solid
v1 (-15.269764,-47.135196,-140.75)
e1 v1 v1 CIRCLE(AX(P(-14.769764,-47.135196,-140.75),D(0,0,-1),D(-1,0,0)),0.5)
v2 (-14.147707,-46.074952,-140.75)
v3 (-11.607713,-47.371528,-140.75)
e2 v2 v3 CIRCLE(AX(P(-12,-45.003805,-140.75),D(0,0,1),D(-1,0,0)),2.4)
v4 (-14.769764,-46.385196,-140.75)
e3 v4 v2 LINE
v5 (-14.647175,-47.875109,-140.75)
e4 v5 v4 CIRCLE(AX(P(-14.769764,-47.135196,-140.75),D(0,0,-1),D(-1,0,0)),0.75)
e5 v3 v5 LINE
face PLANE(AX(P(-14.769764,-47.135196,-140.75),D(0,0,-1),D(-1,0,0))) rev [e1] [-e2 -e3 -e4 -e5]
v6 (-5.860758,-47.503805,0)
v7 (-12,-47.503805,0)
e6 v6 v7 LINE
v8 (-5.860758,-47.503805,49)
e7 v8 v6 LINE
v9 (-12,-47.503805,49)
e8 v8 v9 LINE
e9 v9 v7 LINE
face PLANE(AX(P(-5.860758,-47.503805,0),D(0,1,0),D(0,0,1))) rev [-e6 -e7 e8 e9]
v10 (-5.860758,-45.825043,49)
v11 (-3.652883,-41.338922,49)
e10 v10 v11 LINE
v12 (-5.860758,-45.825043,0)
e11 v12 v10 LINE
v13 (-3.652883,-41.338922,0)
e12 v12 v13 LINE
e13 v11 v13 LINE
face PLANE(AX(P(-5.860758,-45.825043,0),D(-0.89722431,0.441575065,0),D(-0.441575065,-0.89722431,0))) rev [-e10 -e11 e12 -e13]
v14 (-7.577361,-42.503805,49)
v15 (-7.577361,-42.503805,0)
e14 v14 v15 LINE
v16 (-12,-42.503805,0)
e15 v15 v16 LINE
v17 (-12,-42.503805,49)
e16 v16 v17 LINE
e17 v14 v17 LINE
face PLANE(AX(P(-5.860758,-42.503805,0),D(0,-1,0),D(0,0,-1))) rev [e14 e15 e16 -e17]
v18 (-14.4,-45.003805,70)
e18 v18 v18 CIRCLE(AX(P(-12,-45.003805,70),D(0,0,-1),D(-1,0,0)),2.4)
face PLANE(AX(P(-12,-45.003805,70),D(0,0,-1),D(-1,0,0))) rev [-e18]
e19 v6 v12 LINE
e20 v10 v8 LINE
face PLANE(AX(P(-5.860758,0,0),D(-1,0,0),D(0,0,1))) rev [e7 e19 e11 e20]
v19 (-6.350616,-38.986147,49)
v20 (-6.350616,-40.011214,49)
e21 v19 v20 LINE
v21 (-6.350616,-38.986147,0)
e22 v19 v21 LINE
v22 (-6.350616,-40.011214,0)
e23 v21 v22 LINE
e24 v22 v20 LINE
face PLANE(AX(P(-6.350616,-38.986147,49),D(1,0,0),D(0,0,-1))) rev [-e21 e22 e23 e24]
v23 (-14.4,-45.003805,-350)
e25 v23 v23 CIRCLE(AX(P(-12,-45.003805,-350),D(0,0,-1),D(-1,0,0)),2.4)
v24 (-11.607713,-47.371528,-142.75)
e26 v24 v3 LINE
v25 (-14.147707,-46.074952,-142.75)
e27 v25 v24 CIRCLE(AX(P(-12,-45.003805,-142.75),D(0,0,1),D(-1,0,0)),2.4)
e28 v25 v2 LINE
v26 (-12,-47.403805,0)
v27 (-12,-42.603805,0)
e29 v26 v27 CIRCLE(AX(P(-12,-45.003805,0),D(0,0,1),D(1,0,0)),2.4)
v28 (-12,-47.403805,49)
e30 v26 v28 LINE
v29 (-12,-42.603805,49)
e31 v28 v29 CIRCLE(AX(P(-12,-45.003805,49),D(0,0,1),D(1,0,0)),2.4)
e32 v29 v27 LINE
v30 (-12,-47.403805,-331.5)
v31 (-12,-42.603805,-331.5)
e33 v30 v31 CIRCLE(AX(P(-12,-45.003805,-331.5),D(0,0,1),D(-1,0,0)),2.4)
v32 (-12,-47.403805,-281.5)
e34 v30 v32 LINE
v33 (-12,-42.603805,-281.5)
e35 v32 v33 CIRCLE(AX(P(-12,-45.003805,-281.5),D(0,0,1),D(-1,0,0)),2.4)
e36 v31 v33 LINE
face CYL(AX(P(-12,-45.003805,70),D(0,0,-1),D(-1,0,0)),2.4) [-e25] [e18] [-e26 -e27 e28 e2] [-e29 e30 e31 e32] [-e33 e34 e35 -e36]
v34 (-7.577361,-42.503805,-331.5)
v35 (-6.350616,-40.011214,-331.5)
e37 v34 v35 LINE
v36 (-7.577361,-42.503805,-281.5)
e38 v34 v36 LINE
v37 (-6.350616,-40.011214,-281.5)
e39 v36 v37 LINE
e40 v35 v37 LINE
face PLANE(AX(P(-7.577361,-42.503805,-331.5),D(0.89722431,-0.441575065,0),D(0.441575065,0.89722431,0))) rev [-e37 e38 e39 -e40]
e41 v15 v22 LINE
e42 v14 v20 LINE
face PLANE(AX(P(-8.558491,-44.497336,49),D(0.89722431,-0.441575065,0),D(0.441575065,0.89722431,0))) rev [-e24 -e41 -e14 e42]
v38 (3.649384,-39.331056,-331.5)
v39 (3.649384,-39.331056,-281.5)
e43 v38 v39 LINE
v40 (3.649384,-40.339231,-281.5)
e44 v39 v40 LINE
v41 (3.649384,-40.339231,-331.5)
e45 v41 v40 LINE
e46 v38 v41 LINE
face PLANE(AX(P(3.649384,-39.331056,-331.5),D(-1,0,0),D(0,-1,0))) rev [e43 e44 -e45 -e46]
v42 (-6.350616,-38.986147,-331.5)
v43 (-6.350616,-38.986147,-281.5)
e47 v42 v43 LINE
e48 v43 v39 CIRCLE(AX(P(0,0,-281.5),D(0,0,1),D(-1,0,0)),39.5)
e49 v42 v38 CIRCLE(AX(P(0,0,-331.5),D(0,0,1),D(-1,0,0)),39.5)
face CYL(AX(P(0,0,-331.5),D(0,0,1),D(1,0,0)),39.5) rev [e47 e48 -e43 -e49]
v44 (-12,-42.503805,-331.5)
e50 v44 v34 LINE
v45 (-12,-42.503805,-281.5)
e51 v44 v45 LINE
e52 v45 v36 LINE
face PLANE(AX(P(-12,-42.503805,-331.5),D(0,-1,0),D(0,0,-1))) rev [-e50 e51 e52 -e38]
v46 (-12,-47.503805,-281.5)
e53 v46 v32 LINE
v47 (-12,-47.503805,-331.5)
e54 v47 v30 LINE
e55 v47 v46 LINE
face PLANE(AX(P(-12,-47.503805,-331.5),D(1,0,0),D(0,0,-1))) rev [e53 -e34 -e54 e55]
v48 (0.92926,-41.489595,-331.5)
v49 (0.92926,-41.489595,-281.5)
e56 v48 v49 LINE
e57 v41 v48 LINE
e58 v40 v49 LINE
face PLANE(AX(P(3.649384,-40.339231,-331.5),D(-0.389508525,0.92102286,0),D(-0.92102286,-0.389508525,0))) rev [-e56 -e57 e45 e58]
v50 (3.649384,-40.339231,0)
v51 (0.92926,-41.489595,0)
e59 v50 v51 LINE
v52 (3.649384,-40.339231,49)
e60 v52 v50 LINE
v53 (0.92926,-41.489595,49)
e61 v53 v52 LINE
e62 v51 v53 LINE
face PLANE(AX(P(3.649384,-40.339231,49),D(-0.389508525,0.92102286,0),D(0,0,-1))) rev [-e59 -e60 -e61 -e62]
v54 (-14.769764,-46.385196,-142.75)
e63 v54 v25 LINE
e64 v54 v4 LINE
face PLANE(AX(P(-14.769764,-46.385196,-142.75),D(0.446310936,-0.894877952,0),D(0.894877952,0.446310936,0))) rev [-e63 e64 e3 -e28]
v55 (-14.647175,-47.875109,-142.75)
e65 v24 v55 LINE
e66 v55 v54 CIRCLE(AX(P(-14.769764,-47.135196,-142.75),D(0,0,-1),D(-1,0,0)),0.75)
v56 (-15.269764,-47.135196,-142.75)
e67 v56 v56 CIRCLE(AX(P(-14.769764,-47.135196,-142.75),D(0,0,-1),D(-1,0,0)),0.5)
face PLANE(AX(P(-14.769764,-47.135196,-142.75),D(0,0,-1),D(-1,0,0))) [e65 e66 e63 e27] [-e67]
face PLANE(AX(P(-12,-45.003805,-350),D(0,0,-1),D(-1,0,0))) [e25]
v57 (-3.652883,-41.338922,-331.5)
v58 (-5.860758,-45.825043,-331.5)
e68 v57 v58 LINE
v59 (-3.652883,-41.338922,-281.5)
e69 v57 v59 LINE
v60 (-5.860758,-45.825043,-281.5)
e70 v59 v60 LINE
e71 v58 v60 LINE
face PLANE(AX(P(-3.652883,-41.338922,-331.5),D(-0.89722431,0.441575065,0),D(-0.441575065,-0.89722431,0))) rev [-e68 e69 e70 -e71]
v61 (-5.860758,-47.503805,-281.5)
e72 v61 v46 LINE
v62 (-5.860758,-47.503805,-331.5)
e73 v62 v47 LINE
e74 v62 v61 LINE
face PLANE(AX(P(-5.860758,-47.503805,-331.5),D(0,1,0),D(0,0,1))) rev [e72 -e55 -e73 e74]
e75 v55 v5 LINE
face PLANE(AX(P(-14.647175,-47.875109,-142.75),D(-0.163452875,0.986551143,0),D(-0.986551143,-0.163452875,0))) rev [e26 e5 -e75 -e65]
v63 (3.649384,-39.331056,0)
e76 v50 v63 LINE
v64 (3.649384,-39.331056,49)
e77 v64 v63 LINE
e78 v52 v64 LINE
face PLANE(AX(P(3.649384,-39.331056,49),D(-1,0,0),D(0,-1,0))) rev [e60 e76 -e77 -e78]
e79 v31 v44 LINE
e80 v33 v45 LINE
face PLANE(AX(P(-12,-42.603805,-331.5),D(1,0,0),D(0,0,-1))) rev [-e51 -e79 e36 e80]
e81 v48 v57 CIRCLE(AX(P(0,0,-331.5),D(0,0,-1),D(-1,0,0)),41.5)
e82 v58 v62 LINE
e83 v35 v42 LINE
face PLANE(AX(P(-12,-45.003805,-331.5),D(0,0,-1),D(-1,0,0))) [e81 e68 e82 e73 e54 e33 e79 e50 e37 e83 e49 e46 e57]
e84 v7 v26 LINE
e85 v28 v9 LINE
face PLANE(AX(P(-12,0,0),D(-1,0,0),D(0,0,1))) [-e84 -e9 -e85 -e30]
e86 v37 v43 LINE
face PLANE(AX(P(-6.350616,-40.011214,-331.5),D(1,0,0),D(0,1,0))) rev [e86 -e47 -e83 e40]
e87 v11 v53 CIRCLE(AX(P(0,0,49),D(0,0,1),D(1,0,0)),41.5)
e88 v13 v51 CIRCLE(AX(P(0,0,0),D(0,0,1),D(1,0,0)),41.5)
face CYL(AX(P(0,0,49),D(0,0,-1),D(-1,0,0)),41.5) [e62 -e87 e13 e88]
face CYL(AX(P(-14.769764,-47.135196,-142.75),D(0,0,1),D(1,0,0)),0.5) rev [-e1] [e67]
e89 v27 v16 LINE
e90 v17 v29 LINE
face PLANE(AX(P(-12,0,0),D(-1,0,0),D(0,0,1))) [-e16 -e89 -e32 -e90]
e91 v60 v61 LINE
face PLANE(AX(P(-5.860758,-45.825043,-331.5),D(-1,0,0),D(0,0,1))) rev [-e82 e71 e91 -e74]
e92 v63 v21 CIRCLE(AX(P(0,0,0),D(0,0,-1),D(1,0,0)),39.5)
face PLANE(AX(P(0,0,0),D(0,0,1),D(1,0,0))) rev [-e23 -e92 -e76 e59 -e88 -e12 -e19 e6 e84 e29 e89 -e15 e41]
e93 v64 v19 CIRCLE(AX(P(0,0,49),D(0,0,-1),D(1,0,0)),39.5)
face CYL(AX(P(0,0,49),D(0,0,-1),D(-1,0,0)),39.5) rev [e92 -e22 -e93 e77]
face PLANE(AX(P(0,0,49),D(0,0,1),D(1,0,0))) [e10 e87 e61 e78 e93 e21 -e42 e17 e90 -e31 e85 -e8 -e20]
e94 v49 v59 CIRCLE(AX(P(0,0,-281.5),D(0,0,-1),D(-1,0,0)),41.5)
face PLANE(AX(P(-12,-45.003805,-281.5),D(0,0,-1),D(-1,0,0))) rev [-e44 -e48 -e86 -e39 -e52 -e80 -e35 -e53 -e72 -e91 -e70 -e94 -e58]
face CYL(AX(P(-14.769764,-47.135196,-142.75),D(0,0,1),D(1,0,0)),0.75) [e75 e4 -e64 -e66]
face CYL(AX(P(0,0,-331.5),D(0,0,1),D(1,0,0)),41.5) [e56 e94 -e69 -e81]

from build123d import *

# Parameters (mm, degrees)
BOSS_EXTRUDE1_DEPTH      = 49
CHAMFER1_SIZE            = 1
CHAMFER2_SIZE            = 1
SKETCH4_W                = 3.006754005
SKETCH4_H                = 49
BOSS_EXTRUDE2_DEPTH      = 5
SKETCH5_W                = 49
SKETCH5_H                = 5
BOSS_EXTRUDE3_DEPTH      = 6.139242
BOSS_EXTRUDE4_DEPTH      = 350
BOSS_EXTRUDE4_DEPTH_BACK = 70
SKETCH6_R                = 2.4
BOSS_EXTRUDE5_START      = 50
BOSS_EXTRUDE5_DEPTH      = 50
SKETCH11_R               = 0.5
BOSS_EXTRUDE9_DEPTH      = 2


with BuildPart() as part:
    # Sketch1 → Boss-Extrude1 (new body)
    with BuildSketch(Plane.XY):
        with BuildLine():
            Line((-6.350615501, -38.986147319), (-6.350615501, -41.01121411))
            ThreePointArc((-6.350615501, -41.01121411), (-1.360537007, -41.477692065), (3.649384499, -41.339230675))
            Line((3.649384499, -41.339230675), (3.649384499, -39.331056339))
            ThreePointArc((3.649384499, -39.331056339), (-1.361580989, -39.476525901), (-6.350615501, -38.986147319))
        make_face()
    extrude(amount=BOSS_EXTRUDE1_DEPTH)

    # Chamfer1
    # the kernel refuses this chamfer: 3, 1 mm, written as the material it takes off along each edge
    with BuildSketch(Plane(origin=(3.649384499, -41.339230675, -7.093753287), x_dir=(0, 1, 0), z_dir=(0, 0, 1))) as chamfer1_piece_1:
        with BuildLine():
            Line((CHAMFER1_SIZE, 0), (-0.150364113, 2.720124405))
            ThreePointArc((-0.150364113, 2.720124405), (-0.100586913, 1.415213895), (0, 0))
            Line((0, 0), (CHAMFER1_SIZE, 0))
        make_face()
    extrude(amount=63.187506575, mode=Mode.SUBTRACT)

    # Chamfer2
    # the kernel refuses this chamfer: 3, 1 mm, written as the material it takes off along each edge
    with BuildSketch(Plane(origin=(-6.350615501, -41.01121411, -7.077780992), x_dir=(0.992702552846142, -0.12058872904526673, 0), z_dir=(0, 0, 1))) as chamfer2_piece_1:
        with BuildLine():
            Line((2.717564067, 0), (-CHAMFER2_SIZE * 0.120588729045, CHAMFER2_SIZE * 0.992702552846))
            Line((-CHAMFER2_SIZE * 0.120588729045, CHAMFER2_SIZE * 0.992702552846), (0, 0))
            ThreePointArc((0, 0), (1.415420862, -0.022211756), (2.717564067, 0))
        make_face()
    extrude(amount=63.155561983, mode=Mode.SUBTRACT)

    # Sketch4 → Boss-Extrude2 (add)
    with BuildSketch(Plane(origin=(-17.090415502, -34.725548264, 0), x_dir=(0.8972243095002063, -0.44157506546665215, 0), z_dir=(-0.44157506546665215, -0.8972243095002063, 0))):
        with Locations((13.473404886, 24.5)):
            Rectangle(SKETCH4_W, SKETCH4_H)
    extrude(amount=BOSS_EXTRUDE2_DEPTH)

    # Sketch5 → Boss-Extrude3 (add)
    with BuildSketch(Plane(origin=(-12, 0, 0), x_dir=(0, 0, -1), z_dir=(1, 0, 0))):
        with Locations((-24.5, -45.003805325)):
            Rectangle(SKETCH5_W, SKETCH5_H)
    extrude(amount=BOSS_EXTRUDE3_DEPTH)

    # Sketch6 → Boss-Extrude4 (add, two sides: drawn at the far end of the back side and taken through both)
    with BuildSketch(Plane(origin=(0, 0, 0), x_dir=(-1, 0, 0), z_dir=(0, 0, -1)).offset(-BOSS_EXTRUDE4_DEPTH_BACK)):
        with Locations((12, -45.003805325)):
            Circle(SKETCH6_R)
    extrude(amount=BOSS_EXTRUDE4_DEPTH + BOSS_EXTRUDE4_DEPTH_BACK)

    # Sketch8 → Boss-Extrude5 (add)
    with BuildSketch(Plane(origin=(0, 0, -281.5), x_dir=(-1, 0, 0), z_dir=(0, 0, -1)).offset(BOSS_EXTRUDE5_START)):
        with BuildLine():
            Line((12, -47.503805325), (12, -47.403805325))
            ThreePointArc((12, -47.403805325), (9.6, -45.003805325), (12, -42.603805325))
            Line((12, -42.603805325), (12, -42.503805325))
            Line((12, -42.503805325), (7.577361274, -42.503805325))
            Line((7.577361274, -42.503805325), (6.350615501, -40.01121411))
            Line((6.350615501, -40.01121411), (6.350615501, -38.986147319))
            ThreePointArc((6.350615501, -38.986147319), (1.361580989, -39.476525901), (-3.649384499, -39.331056339))
            Line((-3.649384499, -39.331056339), (-3.649384499, -40.339230675))
            Line((-3.649384499, -40.339230675), (-0.929260095, -41.489594788))
            ThreePointArc((-0.929260095, -41.489594788), (1.363893558, -41.477581829), (3.652882714, -41.338921707))
            Line((3.652882714, -41.338921707), (5.860758041, -45.825043254))
            Line((5.860758041, -45.825043254), (5.860758041, -47.503805325))
            Line((5.860758041, -47.503805325), (12, -47.503805325))
        make_face()
    extrude(amount=-BOSS_EXTRUDE5_DEPTH)

    # Sketch11 → Boss-Extrude9 (add)
    with BuildSketch(Plane(origin=(0, 0, -140.75), x_dir=(-1, 0, 0), z_dir=(0, 0, -1))):
        with BuildLine():
            Line((14.769764267, -46.385196028), (14.147707084, -46.074951572))
            ThreePointArc((14.147707084, -46.074951572), (13.091170315, -47.141408503), (11.607713099, -47.371528068))
            Line((11.607713099, -47.371528068), (14.647174611, -47.875109386))
            ThreePointArc((14.647174611, -47.875109386), (15.517238353, -47.196697988), (14.769764267, -46.385196028))
        make_face()
        with Locations((14.769764267, -47.135196028)):
            Circle(SKETCH11_R, mode=Mode.SUBTRACT)
    extrude(amount=BOSS_EXTRUDE9_DEPTH)


solid = part.part
